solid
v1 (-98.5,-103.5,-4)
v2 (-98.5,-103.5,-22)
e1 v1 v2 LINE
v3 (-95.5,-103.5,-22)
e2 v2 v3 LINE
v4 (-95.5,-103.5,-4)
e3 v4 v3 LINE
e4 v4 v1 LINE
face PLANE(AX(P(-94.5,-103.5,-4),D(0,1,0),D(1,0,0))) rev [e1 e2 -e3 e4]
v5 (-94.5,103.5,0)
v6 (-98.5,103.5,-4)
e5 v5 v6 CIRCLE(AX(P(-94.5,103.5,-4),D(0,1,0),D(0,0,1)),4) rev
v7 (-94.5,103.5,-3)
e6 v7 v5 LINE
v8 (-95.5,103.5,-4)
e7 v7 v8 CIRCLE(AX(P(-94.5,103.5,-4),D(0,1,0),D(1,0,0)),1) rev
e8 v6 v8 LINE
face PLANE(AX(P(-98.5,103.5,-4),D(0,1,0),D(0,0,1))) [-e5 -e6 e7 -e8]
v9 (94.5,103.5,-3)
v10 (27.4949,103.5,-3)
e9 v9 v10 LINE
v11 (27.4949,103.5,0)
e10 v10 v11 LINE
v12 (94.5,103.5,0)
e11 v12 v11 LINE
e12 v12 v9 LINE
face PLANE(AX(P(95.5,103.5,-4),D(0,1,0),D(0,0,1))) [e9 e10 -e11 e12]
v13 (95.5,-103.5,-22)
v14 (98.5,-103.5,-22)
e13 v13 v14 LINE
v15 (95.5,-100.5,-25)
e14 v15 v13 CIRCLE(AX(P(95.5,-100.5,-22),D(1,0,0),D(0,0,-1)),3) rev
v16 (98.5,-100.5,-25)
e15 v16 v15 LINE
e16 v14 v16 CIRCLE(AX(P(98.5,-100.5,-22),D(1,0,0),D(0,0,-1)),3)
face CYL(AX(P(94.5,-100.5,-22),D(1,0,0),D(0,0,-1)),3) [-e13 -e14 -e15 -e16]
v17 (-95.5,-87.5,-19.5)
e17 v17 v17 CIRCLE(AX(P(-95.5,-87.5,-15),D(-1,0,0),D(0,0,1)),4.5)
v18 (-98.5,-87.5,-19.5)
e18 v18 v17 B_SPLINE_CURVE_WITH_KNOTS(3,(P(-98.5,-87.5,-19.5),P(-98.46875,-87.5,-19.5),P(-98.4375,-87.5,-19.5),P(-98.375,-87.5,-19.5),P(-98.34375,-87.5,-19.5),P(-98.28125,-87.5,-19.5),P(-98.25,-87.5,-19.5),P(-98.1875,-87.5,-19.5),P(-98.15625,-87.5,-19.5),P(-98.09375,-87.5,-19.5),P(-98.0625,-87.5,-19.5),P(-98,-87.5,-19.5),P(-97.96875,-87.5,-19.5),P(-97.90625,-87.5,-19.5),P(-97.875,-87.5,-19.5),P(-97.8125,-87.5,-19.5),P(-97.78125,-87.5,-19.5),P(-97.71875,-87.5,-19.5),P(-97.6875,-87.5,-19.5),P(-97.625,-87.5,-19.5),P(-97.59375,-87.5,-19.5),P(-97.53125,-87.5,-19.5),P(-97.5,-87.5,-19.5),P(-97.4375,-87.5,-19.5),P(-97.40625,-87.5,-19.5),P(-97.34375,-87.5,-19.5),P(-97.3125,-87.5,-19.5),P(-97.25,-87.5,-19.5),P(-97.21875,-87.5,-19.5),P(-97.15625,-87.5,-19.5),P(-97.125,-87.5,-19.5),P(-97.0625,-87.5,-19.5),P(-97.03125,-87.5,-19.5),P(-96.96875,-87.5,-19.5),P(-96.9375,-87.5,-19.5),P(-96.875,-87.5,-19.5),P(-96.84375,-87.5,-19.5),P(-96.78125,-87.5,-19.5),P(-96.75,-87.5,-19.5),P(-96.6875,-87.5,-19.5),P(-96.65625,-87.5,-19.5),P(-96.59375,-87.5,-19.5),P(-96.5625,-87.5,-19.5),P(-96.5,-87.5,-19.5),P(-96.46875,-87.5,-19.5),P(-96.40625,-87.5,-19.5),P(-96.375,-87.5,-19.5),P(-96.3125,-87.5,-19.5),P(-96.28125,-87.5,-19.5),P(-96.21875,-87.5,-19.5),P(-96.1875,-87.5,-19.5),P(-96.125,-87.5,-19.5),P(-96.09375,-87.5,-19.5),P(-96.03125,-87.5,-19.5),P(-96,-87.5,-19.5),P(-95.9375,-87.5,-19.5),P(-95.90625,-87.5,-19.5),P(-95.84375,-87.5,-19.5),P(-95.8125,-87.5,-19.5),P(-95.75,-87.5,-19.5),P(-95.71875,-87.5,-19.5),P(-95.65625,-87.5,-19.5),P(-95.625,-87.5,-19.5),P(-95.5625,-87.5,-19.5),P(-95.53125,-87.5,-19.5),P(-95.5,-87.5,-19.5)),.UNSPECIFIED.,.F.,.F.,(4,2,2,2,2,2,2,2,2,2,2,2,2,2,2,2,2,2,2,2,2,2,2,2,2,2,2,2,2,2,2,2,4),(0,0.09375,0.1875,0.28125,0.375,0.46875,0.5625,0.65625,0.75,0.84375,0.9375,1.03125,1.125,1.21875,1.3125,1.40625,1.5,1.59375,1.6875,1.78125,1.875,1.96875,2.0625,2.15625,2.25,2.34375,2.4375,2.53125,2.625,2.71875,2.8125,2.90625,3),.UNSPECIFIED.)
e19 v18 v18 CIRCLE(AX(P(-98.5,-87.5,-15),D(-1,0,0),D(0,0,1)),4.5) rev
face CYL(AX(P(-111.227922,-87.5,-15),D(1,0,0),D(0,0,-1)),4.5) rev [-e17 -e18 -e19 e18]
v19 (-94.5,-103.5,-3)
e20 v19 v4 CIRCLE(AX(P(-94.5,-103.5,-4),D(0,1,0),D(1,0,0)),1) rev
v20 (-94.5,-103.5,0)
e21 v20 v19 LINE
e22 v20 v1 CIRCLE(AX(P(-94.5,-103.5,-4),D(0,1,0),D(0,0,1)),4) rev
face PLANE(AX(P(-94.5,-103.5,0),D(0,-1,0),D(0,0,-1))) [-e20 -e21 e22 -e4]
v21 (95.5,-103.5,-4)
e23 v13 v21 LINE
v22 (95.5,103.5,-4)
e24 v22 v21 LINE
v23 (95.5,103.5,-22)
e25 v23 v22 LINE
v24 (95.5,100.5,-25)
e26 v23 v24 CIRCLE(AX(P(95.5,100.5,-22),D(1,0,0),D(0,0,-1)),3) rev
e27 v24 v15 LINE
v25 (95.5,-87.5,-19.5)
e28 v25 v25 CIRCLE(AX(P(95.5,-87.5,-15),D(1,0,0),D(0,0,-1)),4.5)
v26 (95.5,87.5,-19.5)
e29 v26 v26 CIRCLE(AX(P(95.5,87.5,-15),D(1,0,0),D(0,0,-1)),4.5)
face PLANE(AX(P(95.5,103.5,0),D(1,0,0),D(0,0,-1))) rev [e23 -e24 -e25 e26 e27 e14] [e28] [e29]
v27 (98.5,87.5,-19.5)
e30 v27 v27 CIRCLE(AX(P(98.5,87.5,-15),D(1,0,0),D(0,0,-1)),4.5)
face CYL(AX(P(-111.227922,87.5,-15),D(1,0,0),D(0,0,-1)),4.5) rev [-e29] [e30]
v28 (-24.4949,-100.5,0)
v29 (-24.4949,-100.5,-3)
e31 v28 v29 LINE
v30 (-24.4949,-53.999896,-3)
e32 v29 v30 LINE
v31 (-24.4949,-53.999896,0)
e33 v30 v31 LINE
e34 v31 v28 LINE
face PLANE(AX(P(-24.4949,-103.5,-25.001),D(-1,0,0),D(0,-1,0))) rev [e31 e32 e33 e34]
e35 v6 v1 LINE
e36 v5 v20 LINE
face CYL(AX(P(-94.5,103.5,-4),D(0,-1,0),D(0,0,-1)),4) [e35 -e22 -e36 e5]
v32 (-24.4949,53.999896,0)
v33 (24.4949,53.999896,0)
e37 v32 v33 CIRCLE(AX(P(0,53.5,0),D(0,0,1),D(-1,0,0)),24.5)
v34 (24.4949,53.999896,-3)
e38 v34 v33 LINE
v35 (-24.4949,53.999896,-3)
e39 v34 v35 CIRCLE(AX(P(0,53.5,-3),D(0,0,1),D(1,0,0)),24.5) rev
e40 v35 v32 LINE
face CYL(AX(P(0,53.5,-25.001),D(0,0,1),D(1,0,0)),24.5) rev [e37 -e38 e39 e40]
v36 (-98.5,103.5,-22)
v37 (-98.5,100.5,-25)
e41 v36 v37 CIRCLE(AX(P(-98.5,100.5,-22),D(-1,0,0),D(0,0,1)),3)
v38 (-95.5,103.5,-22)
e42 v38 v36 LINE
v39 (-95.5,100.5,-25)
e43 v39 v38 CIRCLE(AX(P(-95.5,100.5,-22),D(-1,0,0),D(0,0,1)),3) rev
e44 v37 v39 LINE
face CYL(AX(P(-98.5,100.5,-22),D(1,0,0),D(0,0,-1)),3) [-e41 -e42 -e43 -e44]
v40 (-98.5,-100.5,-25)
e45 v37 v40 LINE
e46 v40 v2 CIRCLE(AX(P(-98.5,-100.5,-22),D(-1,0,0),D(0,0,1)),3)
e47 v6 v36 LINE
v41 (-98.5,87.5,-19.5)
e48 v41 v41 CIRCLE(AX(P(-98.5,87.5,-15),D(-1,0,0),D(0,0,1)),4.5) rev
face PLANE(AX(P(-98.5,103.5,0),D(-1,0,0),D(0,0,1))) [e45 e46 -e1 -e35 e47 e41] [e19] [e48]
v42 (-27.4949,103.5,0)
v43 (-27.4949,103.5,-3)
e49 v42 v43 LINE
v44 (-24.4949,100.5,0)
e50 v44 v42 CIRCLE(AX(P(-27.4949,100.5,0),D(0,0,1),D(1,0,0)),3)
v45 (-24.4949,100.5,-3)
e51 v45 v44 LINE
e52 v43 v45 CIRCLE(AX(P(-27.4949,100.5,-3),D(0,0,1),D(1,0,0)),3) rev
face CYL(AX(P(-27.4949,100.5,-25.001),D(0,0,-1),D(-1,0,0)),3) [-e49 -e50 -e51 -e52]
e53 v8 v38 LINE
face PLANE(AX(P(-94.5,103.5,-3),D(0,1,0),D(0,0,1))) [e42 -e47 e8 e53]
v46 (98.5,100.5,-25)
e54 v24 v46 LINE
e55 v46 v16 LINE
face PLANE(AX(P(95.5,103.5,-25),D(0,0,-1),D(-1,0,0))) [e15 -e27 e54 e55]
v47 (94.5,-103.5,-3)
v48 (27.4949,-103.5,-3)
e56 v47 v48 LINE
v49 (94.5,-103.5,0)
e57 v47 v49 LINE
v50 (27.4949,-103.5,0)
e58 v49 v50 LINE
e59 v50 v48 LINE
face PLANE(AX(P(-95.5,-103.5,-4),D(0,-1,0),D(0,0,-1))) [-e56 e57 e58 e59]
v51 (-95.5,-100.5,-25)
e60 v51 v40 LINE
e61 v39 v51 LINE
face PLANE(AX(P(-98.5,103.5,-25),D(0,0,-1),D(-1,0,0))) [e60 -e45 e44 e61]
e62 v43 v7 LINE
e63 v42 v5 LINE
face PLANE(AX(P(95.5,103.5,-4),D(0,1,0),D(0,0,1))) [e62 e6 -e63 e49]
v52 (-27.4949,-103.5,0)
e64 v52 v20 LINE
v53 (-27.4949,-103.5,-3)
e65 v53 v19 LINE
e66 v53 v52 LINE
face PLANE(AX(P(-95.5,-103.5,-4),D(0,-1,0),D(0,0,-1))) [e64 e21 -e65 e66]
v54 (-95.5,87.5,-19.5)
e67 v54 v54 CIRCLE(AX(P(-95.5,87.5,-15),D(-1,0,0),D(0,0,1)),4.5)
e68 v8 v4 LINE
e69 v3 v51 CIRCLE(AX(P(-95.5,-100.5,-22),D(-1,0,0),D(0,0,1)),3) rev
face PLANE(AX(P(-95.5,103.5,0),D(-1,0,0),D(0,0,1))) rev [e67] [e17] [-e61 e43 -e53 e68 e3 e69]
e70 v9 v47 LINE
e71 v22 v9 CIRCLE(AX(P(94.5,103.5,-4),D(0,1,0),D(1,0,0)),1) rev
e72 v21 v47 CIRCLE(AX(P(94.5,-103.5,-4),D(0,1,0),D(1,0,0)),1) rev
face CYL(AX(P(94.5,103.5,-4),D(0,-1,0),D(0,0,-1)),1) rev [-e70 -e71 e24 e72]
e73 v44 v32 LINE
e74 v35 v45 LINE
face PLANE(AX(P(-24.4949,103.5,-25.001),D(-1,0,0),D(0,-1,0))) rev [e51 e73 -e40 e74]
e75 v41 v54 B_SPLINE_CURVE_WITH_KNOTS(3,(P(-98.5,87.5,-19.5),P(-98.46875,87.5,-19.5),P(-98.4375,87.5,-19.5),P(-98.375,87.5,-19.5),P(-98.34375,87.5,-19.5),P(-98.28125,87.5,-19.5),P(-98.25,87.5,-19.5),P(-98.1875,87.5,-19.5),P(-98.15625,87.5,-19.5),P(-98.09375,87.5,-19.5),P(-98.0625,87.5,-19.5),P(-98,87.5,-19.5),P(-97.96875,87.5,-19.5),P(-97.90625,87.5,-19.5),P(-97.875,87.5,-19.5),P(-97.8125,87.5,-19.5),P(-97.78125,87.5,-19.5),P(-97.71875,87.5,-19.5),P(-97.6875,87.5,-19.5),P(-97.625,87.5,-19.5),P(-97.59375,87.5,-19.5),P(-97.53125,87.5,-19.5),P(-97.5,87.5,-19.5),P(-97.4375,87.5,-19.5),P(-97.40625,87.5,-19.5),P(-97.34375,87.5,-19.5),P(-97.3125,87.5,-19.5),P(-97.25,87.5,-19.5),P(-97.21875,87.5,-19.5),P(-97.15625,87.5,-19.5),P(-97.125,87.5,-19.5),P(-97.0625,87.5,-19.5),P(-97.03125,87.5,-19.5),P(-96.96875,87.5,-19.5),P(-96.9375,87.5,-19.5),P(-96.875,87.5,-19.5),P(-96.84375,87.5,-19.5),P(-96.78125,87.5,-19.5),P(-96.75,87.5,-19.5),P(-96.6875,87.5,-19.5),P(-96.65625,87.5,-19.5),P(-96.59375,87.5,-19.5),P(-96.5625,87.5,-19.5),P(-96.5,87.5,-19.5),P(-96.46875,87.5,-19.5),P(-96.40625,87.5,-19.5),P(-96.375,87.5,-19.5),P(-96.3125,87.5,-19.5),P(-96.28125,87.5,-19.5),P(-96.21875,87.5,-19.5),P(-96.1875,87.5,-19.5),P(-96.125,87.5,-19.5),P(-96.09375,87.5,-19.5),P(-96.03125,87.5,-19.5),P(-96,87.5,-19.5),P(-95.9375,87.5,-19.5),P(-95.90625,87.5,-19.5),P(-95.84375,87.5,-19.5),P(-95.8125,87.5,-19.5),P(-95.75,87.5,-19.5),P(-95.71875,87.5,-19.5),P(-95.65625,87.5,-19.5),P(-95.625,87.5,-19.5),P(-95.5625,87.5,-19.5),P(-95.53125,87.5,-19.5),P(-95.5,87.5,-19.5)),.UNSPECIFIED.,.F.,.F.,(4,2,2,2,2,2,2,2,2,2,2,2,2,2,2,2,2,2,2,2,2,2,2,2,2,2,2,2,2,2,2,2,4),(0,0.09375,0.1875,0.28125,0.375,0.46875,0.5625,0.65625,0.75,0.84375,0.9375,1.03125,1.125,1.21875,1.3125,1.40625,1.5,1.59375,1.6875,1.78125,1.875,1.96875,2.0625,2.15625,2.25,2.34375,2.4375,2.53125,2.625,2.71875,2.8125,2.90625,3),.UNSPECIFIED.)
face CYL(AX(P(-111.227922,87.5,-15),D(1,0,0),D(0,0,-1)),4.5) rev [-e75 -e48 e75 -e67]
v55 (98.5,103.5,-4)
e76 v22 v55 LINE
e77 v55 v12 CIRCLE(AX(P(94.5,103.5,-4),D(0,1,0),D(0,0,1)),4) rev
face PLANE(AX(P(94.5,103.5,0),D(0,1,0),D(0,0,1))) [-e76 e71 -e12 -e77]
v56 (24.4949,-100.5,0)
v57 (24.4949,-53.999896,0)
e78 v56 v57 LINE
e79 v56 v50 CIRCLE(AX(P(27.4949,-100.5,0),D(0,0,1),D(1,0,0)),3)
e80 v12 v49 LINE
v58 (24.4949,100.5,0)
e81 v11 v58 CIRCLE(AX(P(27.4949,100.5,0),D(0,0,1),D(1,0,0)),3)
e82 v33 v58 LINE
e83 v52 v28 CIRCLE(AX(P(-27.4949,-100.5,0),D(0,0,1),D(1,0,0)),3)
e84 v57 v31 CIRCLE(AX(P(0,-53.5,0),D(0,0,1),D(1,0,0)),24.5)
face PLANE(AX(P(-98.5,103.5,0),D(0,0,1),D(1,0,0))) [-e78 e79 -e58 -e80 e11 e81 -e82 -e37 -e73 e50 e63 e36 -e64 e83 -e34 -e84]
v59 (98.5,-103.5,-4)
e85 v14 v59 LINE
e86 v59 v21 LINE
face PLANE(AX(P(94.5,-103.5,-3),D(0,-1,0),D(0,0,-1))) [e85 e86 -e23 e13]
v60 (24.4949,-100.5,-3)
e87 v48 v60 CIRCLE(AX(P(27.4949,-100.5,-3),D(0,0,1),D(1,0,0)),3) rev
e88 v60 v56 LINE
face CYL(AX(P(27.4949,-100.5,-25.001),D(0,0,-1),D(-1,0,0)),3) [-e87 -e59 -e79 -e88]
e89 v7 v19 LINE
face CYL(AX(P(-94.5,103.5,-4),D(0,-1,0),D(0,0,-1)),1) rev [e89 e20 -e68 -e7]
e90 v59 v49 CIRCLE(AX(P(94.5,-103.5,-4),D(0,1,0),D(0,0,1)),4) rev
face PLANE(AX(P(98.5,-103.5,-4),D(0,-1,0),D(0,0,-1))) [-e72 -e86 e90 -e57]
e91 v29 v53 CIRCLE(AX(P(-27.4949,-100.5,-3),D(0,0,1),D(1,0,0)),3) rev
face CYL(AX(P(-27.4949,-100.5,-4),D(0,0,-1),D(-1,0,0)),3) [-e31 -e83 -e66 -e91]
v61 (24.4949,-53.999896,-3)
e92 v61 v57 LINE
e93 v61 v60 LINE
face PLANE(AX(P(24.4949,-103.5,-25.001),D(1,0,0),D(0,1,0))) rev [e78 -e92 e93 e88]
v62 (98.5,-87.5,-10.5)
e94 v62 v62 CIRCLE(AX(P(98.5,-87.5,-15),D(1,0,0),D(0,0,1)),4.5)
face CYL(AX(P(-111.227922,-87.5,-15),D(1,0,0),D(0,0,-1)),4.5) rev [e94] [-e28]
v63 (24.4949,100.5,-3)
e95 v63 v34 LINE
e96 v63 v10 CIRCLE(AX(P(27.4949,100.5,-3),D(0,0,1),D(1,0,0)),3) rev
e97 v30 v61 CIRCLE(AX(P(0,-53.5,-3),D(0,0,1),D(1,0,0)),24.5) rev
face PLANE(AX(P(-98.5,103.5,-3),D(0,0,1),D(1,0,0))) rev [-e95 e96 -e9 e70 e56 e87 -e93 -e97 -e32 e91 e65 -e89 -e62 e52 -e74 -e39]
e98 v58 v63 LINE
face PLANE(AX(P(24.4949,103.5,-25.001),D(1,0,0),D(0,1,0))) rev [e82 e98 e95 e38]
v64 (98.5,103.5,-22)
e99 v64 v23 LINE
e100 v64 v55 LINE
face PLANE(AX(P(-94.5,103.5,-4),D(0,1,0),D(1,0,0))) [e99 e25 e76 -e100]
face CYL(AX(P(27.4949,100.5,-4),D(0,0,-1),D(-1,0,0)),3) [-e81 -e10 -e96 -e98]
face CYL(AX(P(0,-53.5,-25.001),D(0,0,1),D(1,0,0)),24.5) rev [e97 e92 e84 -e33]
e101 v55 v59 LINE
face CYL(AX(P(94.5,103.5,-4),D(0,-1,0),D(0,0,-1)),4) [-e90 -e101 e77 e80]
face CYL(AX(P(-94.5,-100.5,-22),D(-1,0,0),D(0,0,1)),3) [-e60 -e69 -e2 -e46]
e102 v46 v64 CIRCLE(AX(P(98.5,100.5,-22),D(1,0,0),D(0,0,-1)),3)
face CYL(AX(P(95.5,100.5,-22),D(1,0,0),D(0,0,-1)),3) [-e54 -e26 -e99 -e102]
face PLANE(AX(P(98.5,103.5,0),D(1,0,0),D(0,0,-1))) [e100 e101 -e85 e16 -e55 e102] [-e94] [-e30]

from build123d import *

# Parameters (mm, degrees)
BASE_FLANGE1_START = -103.5
BASE_FLANGE1_DEPTH = 207
CUT_EXTRUDE1_REACH = 225.934
SKETCH6_R          = 4.5
CUT_EXTRUDE2_REACH = 147.05
FILLET1_R          = 3
FILLET2_R          = 3


# Read off the part's stored shape, not the designer's step: Base-Flange1
with BuildPart() as part:
    # Base-Flange1 outline → Base-Flange1 (new body)
    with BuildSketch(Plane(origin=(0, 0, 0), x_dir=(1, 0, 0), z_dir=(0, 1, 0)).offset(BASE_FLANGE1_START)):
        with BuildLine():
            Line((-95.5, 4), (-95.5, 25))
            Line((-95.5, 25), (-98.5, 25))
            Line((-98.5, 25), (-98.5, 4))
            ThreePointArc((-98.5, 4), (-97.328427125, 1.171572875), (-94.5, 0))
            Line((-94.5, 0), (94.5, 0))
            ThreePointArc((94.5, 0), (97.328427125, 1.171572875), (98.5, 4))
            Line((98.5, 4), (98.5, 25))
            Line((98.5, 25), (95.5, 25))
            Line((95.5, 25), (95.5, 4))
            ThreePointArc((95.5, 4), (95.207106781, 3.292893219), (94.5, 3))
            Line((94.5, 3), (-94.5, 3))
            ThreePointArc((-94.5, 3), (-95.207106781, 3.292893219), (-95.5, 4))
        make_face()
    extrude(amount=BASE_FLANGE1_DEPTH)

    # Cut-Extrude1: up to this face of the body (flat: up to its plane)
    cut_extrude1_end = Plane(part.part.faces().sort_by_distance((-98.5, 0, -14.5))[0])
    # Sketch6 → Cut-Extrude1 (cut, up to the picked face)
    with BuildSketch(Plane(origin=(98.5, 0, 0), x_dir=(0, 0, -1), z_dir=(1, 0, 0)), mode=Mode.PRIVATE) as cut_extrude1_sk1:
        with Locations((15, 87.5)):
            Circle(SKETCH6_R)
    cut_extrude1_tool1 = split(extrude(cut_extrude1_sk1.sketch, amount=-CUT_EXTRUDE1_REACH, mode=Mode.PRIVATE), bisect_by=cut_extrude1_end, keep=Keep.BOTH, mode=Mode.PRIVATE)
    # Sketch6 → Cut-Extrude1 (cut, up to the picked face)
    with BuildSketch(Plane(origin=(98.5, 0, 0), x_dir=(0, 0, -1), z_dir=(1, 0, 0)), mode=Mode.PRIVATE) as cut_extrude1_sk2:
        with Locations((15, -87.5)):
            Circle(SKETCH6_R)
    cut_extrude1_tool2 = split(extrude(cut_extrude1_sk2.sketch, amount=-CUT_EXTRUDE1_REACH, mode=Mode.PRIVATE), bisect_by=cut_extrude1_end, keep=Keep.BOTH, mode=Mode.PRIVATE)
    add(cut_extrude1_tool1.solids().sort_by(Axis((98.5, 87.5, -15), (-1, 0, 0)))[0], mode=Mode.SUBTRACT)
    add(cut_extrude1_tool2.solids().sort_by(Axis((98.5, -87.5, -15), (-1, 0, 0)))[0], mode=Mode.SUBTRACT)

    # Sketch7 → Cut-Extrude2 (cut, up to next)
    with BuildSketch(Plane.XY, mode=Mode.PRIVATE) as cut_extrude2_sk1:
        with BuildLine():
            Line((24.494899552, 103.5), (24.494899552, 53.999895909))
            ThreePointArc((24.494899552, 53.999895909), (0, 29), (-24.494899552, 53.999895909))
            Line((-24.494899552, 53.999895909), (-24.494899552, 103.5))
            Line((-24.494899552, 103.5), (24.494899552, 103.5))
        make_face()
    cut_extrude2_tool1 = extrude(cut_extrude2_sk1.sketch, amount=-CUT_EXTRUDE2_REACH, mode=Mode.PRIVATE) & part.part
    # Sketch7 → Cut-Extrude2 (cut, up to next)
    with BuildSketch(Plane.XY, mode=Mode.PRIVATE) as cut_extrude2_sk2:
        with BuildLine():
            Line((24.494899552, -103.5), (24.494899552, -53.999895909))
            ThreePointArc((24.494899552, -53.999895909), (0, -29), (-24.494899552, -53.999895909))
            Line((-24.494899552, -53.999895909), (-24.494899552, -103.5))
            Line((-24.494899552, -103.5), (24.494899552, -103.5))
        make_face()
    cut_extrude2_tool2 = extrude(cut_extrude2_sk2.sketch, amount=-CUT_EXTRUDE2_REACH, mode=Mode.PRIVATE) & part.part
    add(cut_extrude2_tool1.solids().sort_by_distance((0, 68.661453, 0))[0], mode=Mode.SUBTRACT)
    add(cut_extrude2_tool2.solids().sort_by_distance((0, -68.661453, 0))[0], mode=Mode.SUBTRACT)

    # Fillet1
    fillet1_edges = [part.edges().sort_by_distance(p)[0] for p in [
        (97, -103.5, -25),
        (-97, -103.5, -25),
        (97, 103.5, -25),
        (-97, 103.5, -25),
    ]]
    fillet(fillet1_edges, radius=FILLET1_R)

    # Fillet2
    fillet2_edges = [part.edges().sort_by_distance(p)[0] for p in [
        (-24.494899552, 103.5, -1.5),
        (24.494899552, 103.5, -1.5),
        (24.494899552, -103.5, -1.5),
        (-24.494899552, -103.5, -1.5),
    ]]
    fillet(fillet2_edges, radius=FILLET2_R)


solid = part.part
